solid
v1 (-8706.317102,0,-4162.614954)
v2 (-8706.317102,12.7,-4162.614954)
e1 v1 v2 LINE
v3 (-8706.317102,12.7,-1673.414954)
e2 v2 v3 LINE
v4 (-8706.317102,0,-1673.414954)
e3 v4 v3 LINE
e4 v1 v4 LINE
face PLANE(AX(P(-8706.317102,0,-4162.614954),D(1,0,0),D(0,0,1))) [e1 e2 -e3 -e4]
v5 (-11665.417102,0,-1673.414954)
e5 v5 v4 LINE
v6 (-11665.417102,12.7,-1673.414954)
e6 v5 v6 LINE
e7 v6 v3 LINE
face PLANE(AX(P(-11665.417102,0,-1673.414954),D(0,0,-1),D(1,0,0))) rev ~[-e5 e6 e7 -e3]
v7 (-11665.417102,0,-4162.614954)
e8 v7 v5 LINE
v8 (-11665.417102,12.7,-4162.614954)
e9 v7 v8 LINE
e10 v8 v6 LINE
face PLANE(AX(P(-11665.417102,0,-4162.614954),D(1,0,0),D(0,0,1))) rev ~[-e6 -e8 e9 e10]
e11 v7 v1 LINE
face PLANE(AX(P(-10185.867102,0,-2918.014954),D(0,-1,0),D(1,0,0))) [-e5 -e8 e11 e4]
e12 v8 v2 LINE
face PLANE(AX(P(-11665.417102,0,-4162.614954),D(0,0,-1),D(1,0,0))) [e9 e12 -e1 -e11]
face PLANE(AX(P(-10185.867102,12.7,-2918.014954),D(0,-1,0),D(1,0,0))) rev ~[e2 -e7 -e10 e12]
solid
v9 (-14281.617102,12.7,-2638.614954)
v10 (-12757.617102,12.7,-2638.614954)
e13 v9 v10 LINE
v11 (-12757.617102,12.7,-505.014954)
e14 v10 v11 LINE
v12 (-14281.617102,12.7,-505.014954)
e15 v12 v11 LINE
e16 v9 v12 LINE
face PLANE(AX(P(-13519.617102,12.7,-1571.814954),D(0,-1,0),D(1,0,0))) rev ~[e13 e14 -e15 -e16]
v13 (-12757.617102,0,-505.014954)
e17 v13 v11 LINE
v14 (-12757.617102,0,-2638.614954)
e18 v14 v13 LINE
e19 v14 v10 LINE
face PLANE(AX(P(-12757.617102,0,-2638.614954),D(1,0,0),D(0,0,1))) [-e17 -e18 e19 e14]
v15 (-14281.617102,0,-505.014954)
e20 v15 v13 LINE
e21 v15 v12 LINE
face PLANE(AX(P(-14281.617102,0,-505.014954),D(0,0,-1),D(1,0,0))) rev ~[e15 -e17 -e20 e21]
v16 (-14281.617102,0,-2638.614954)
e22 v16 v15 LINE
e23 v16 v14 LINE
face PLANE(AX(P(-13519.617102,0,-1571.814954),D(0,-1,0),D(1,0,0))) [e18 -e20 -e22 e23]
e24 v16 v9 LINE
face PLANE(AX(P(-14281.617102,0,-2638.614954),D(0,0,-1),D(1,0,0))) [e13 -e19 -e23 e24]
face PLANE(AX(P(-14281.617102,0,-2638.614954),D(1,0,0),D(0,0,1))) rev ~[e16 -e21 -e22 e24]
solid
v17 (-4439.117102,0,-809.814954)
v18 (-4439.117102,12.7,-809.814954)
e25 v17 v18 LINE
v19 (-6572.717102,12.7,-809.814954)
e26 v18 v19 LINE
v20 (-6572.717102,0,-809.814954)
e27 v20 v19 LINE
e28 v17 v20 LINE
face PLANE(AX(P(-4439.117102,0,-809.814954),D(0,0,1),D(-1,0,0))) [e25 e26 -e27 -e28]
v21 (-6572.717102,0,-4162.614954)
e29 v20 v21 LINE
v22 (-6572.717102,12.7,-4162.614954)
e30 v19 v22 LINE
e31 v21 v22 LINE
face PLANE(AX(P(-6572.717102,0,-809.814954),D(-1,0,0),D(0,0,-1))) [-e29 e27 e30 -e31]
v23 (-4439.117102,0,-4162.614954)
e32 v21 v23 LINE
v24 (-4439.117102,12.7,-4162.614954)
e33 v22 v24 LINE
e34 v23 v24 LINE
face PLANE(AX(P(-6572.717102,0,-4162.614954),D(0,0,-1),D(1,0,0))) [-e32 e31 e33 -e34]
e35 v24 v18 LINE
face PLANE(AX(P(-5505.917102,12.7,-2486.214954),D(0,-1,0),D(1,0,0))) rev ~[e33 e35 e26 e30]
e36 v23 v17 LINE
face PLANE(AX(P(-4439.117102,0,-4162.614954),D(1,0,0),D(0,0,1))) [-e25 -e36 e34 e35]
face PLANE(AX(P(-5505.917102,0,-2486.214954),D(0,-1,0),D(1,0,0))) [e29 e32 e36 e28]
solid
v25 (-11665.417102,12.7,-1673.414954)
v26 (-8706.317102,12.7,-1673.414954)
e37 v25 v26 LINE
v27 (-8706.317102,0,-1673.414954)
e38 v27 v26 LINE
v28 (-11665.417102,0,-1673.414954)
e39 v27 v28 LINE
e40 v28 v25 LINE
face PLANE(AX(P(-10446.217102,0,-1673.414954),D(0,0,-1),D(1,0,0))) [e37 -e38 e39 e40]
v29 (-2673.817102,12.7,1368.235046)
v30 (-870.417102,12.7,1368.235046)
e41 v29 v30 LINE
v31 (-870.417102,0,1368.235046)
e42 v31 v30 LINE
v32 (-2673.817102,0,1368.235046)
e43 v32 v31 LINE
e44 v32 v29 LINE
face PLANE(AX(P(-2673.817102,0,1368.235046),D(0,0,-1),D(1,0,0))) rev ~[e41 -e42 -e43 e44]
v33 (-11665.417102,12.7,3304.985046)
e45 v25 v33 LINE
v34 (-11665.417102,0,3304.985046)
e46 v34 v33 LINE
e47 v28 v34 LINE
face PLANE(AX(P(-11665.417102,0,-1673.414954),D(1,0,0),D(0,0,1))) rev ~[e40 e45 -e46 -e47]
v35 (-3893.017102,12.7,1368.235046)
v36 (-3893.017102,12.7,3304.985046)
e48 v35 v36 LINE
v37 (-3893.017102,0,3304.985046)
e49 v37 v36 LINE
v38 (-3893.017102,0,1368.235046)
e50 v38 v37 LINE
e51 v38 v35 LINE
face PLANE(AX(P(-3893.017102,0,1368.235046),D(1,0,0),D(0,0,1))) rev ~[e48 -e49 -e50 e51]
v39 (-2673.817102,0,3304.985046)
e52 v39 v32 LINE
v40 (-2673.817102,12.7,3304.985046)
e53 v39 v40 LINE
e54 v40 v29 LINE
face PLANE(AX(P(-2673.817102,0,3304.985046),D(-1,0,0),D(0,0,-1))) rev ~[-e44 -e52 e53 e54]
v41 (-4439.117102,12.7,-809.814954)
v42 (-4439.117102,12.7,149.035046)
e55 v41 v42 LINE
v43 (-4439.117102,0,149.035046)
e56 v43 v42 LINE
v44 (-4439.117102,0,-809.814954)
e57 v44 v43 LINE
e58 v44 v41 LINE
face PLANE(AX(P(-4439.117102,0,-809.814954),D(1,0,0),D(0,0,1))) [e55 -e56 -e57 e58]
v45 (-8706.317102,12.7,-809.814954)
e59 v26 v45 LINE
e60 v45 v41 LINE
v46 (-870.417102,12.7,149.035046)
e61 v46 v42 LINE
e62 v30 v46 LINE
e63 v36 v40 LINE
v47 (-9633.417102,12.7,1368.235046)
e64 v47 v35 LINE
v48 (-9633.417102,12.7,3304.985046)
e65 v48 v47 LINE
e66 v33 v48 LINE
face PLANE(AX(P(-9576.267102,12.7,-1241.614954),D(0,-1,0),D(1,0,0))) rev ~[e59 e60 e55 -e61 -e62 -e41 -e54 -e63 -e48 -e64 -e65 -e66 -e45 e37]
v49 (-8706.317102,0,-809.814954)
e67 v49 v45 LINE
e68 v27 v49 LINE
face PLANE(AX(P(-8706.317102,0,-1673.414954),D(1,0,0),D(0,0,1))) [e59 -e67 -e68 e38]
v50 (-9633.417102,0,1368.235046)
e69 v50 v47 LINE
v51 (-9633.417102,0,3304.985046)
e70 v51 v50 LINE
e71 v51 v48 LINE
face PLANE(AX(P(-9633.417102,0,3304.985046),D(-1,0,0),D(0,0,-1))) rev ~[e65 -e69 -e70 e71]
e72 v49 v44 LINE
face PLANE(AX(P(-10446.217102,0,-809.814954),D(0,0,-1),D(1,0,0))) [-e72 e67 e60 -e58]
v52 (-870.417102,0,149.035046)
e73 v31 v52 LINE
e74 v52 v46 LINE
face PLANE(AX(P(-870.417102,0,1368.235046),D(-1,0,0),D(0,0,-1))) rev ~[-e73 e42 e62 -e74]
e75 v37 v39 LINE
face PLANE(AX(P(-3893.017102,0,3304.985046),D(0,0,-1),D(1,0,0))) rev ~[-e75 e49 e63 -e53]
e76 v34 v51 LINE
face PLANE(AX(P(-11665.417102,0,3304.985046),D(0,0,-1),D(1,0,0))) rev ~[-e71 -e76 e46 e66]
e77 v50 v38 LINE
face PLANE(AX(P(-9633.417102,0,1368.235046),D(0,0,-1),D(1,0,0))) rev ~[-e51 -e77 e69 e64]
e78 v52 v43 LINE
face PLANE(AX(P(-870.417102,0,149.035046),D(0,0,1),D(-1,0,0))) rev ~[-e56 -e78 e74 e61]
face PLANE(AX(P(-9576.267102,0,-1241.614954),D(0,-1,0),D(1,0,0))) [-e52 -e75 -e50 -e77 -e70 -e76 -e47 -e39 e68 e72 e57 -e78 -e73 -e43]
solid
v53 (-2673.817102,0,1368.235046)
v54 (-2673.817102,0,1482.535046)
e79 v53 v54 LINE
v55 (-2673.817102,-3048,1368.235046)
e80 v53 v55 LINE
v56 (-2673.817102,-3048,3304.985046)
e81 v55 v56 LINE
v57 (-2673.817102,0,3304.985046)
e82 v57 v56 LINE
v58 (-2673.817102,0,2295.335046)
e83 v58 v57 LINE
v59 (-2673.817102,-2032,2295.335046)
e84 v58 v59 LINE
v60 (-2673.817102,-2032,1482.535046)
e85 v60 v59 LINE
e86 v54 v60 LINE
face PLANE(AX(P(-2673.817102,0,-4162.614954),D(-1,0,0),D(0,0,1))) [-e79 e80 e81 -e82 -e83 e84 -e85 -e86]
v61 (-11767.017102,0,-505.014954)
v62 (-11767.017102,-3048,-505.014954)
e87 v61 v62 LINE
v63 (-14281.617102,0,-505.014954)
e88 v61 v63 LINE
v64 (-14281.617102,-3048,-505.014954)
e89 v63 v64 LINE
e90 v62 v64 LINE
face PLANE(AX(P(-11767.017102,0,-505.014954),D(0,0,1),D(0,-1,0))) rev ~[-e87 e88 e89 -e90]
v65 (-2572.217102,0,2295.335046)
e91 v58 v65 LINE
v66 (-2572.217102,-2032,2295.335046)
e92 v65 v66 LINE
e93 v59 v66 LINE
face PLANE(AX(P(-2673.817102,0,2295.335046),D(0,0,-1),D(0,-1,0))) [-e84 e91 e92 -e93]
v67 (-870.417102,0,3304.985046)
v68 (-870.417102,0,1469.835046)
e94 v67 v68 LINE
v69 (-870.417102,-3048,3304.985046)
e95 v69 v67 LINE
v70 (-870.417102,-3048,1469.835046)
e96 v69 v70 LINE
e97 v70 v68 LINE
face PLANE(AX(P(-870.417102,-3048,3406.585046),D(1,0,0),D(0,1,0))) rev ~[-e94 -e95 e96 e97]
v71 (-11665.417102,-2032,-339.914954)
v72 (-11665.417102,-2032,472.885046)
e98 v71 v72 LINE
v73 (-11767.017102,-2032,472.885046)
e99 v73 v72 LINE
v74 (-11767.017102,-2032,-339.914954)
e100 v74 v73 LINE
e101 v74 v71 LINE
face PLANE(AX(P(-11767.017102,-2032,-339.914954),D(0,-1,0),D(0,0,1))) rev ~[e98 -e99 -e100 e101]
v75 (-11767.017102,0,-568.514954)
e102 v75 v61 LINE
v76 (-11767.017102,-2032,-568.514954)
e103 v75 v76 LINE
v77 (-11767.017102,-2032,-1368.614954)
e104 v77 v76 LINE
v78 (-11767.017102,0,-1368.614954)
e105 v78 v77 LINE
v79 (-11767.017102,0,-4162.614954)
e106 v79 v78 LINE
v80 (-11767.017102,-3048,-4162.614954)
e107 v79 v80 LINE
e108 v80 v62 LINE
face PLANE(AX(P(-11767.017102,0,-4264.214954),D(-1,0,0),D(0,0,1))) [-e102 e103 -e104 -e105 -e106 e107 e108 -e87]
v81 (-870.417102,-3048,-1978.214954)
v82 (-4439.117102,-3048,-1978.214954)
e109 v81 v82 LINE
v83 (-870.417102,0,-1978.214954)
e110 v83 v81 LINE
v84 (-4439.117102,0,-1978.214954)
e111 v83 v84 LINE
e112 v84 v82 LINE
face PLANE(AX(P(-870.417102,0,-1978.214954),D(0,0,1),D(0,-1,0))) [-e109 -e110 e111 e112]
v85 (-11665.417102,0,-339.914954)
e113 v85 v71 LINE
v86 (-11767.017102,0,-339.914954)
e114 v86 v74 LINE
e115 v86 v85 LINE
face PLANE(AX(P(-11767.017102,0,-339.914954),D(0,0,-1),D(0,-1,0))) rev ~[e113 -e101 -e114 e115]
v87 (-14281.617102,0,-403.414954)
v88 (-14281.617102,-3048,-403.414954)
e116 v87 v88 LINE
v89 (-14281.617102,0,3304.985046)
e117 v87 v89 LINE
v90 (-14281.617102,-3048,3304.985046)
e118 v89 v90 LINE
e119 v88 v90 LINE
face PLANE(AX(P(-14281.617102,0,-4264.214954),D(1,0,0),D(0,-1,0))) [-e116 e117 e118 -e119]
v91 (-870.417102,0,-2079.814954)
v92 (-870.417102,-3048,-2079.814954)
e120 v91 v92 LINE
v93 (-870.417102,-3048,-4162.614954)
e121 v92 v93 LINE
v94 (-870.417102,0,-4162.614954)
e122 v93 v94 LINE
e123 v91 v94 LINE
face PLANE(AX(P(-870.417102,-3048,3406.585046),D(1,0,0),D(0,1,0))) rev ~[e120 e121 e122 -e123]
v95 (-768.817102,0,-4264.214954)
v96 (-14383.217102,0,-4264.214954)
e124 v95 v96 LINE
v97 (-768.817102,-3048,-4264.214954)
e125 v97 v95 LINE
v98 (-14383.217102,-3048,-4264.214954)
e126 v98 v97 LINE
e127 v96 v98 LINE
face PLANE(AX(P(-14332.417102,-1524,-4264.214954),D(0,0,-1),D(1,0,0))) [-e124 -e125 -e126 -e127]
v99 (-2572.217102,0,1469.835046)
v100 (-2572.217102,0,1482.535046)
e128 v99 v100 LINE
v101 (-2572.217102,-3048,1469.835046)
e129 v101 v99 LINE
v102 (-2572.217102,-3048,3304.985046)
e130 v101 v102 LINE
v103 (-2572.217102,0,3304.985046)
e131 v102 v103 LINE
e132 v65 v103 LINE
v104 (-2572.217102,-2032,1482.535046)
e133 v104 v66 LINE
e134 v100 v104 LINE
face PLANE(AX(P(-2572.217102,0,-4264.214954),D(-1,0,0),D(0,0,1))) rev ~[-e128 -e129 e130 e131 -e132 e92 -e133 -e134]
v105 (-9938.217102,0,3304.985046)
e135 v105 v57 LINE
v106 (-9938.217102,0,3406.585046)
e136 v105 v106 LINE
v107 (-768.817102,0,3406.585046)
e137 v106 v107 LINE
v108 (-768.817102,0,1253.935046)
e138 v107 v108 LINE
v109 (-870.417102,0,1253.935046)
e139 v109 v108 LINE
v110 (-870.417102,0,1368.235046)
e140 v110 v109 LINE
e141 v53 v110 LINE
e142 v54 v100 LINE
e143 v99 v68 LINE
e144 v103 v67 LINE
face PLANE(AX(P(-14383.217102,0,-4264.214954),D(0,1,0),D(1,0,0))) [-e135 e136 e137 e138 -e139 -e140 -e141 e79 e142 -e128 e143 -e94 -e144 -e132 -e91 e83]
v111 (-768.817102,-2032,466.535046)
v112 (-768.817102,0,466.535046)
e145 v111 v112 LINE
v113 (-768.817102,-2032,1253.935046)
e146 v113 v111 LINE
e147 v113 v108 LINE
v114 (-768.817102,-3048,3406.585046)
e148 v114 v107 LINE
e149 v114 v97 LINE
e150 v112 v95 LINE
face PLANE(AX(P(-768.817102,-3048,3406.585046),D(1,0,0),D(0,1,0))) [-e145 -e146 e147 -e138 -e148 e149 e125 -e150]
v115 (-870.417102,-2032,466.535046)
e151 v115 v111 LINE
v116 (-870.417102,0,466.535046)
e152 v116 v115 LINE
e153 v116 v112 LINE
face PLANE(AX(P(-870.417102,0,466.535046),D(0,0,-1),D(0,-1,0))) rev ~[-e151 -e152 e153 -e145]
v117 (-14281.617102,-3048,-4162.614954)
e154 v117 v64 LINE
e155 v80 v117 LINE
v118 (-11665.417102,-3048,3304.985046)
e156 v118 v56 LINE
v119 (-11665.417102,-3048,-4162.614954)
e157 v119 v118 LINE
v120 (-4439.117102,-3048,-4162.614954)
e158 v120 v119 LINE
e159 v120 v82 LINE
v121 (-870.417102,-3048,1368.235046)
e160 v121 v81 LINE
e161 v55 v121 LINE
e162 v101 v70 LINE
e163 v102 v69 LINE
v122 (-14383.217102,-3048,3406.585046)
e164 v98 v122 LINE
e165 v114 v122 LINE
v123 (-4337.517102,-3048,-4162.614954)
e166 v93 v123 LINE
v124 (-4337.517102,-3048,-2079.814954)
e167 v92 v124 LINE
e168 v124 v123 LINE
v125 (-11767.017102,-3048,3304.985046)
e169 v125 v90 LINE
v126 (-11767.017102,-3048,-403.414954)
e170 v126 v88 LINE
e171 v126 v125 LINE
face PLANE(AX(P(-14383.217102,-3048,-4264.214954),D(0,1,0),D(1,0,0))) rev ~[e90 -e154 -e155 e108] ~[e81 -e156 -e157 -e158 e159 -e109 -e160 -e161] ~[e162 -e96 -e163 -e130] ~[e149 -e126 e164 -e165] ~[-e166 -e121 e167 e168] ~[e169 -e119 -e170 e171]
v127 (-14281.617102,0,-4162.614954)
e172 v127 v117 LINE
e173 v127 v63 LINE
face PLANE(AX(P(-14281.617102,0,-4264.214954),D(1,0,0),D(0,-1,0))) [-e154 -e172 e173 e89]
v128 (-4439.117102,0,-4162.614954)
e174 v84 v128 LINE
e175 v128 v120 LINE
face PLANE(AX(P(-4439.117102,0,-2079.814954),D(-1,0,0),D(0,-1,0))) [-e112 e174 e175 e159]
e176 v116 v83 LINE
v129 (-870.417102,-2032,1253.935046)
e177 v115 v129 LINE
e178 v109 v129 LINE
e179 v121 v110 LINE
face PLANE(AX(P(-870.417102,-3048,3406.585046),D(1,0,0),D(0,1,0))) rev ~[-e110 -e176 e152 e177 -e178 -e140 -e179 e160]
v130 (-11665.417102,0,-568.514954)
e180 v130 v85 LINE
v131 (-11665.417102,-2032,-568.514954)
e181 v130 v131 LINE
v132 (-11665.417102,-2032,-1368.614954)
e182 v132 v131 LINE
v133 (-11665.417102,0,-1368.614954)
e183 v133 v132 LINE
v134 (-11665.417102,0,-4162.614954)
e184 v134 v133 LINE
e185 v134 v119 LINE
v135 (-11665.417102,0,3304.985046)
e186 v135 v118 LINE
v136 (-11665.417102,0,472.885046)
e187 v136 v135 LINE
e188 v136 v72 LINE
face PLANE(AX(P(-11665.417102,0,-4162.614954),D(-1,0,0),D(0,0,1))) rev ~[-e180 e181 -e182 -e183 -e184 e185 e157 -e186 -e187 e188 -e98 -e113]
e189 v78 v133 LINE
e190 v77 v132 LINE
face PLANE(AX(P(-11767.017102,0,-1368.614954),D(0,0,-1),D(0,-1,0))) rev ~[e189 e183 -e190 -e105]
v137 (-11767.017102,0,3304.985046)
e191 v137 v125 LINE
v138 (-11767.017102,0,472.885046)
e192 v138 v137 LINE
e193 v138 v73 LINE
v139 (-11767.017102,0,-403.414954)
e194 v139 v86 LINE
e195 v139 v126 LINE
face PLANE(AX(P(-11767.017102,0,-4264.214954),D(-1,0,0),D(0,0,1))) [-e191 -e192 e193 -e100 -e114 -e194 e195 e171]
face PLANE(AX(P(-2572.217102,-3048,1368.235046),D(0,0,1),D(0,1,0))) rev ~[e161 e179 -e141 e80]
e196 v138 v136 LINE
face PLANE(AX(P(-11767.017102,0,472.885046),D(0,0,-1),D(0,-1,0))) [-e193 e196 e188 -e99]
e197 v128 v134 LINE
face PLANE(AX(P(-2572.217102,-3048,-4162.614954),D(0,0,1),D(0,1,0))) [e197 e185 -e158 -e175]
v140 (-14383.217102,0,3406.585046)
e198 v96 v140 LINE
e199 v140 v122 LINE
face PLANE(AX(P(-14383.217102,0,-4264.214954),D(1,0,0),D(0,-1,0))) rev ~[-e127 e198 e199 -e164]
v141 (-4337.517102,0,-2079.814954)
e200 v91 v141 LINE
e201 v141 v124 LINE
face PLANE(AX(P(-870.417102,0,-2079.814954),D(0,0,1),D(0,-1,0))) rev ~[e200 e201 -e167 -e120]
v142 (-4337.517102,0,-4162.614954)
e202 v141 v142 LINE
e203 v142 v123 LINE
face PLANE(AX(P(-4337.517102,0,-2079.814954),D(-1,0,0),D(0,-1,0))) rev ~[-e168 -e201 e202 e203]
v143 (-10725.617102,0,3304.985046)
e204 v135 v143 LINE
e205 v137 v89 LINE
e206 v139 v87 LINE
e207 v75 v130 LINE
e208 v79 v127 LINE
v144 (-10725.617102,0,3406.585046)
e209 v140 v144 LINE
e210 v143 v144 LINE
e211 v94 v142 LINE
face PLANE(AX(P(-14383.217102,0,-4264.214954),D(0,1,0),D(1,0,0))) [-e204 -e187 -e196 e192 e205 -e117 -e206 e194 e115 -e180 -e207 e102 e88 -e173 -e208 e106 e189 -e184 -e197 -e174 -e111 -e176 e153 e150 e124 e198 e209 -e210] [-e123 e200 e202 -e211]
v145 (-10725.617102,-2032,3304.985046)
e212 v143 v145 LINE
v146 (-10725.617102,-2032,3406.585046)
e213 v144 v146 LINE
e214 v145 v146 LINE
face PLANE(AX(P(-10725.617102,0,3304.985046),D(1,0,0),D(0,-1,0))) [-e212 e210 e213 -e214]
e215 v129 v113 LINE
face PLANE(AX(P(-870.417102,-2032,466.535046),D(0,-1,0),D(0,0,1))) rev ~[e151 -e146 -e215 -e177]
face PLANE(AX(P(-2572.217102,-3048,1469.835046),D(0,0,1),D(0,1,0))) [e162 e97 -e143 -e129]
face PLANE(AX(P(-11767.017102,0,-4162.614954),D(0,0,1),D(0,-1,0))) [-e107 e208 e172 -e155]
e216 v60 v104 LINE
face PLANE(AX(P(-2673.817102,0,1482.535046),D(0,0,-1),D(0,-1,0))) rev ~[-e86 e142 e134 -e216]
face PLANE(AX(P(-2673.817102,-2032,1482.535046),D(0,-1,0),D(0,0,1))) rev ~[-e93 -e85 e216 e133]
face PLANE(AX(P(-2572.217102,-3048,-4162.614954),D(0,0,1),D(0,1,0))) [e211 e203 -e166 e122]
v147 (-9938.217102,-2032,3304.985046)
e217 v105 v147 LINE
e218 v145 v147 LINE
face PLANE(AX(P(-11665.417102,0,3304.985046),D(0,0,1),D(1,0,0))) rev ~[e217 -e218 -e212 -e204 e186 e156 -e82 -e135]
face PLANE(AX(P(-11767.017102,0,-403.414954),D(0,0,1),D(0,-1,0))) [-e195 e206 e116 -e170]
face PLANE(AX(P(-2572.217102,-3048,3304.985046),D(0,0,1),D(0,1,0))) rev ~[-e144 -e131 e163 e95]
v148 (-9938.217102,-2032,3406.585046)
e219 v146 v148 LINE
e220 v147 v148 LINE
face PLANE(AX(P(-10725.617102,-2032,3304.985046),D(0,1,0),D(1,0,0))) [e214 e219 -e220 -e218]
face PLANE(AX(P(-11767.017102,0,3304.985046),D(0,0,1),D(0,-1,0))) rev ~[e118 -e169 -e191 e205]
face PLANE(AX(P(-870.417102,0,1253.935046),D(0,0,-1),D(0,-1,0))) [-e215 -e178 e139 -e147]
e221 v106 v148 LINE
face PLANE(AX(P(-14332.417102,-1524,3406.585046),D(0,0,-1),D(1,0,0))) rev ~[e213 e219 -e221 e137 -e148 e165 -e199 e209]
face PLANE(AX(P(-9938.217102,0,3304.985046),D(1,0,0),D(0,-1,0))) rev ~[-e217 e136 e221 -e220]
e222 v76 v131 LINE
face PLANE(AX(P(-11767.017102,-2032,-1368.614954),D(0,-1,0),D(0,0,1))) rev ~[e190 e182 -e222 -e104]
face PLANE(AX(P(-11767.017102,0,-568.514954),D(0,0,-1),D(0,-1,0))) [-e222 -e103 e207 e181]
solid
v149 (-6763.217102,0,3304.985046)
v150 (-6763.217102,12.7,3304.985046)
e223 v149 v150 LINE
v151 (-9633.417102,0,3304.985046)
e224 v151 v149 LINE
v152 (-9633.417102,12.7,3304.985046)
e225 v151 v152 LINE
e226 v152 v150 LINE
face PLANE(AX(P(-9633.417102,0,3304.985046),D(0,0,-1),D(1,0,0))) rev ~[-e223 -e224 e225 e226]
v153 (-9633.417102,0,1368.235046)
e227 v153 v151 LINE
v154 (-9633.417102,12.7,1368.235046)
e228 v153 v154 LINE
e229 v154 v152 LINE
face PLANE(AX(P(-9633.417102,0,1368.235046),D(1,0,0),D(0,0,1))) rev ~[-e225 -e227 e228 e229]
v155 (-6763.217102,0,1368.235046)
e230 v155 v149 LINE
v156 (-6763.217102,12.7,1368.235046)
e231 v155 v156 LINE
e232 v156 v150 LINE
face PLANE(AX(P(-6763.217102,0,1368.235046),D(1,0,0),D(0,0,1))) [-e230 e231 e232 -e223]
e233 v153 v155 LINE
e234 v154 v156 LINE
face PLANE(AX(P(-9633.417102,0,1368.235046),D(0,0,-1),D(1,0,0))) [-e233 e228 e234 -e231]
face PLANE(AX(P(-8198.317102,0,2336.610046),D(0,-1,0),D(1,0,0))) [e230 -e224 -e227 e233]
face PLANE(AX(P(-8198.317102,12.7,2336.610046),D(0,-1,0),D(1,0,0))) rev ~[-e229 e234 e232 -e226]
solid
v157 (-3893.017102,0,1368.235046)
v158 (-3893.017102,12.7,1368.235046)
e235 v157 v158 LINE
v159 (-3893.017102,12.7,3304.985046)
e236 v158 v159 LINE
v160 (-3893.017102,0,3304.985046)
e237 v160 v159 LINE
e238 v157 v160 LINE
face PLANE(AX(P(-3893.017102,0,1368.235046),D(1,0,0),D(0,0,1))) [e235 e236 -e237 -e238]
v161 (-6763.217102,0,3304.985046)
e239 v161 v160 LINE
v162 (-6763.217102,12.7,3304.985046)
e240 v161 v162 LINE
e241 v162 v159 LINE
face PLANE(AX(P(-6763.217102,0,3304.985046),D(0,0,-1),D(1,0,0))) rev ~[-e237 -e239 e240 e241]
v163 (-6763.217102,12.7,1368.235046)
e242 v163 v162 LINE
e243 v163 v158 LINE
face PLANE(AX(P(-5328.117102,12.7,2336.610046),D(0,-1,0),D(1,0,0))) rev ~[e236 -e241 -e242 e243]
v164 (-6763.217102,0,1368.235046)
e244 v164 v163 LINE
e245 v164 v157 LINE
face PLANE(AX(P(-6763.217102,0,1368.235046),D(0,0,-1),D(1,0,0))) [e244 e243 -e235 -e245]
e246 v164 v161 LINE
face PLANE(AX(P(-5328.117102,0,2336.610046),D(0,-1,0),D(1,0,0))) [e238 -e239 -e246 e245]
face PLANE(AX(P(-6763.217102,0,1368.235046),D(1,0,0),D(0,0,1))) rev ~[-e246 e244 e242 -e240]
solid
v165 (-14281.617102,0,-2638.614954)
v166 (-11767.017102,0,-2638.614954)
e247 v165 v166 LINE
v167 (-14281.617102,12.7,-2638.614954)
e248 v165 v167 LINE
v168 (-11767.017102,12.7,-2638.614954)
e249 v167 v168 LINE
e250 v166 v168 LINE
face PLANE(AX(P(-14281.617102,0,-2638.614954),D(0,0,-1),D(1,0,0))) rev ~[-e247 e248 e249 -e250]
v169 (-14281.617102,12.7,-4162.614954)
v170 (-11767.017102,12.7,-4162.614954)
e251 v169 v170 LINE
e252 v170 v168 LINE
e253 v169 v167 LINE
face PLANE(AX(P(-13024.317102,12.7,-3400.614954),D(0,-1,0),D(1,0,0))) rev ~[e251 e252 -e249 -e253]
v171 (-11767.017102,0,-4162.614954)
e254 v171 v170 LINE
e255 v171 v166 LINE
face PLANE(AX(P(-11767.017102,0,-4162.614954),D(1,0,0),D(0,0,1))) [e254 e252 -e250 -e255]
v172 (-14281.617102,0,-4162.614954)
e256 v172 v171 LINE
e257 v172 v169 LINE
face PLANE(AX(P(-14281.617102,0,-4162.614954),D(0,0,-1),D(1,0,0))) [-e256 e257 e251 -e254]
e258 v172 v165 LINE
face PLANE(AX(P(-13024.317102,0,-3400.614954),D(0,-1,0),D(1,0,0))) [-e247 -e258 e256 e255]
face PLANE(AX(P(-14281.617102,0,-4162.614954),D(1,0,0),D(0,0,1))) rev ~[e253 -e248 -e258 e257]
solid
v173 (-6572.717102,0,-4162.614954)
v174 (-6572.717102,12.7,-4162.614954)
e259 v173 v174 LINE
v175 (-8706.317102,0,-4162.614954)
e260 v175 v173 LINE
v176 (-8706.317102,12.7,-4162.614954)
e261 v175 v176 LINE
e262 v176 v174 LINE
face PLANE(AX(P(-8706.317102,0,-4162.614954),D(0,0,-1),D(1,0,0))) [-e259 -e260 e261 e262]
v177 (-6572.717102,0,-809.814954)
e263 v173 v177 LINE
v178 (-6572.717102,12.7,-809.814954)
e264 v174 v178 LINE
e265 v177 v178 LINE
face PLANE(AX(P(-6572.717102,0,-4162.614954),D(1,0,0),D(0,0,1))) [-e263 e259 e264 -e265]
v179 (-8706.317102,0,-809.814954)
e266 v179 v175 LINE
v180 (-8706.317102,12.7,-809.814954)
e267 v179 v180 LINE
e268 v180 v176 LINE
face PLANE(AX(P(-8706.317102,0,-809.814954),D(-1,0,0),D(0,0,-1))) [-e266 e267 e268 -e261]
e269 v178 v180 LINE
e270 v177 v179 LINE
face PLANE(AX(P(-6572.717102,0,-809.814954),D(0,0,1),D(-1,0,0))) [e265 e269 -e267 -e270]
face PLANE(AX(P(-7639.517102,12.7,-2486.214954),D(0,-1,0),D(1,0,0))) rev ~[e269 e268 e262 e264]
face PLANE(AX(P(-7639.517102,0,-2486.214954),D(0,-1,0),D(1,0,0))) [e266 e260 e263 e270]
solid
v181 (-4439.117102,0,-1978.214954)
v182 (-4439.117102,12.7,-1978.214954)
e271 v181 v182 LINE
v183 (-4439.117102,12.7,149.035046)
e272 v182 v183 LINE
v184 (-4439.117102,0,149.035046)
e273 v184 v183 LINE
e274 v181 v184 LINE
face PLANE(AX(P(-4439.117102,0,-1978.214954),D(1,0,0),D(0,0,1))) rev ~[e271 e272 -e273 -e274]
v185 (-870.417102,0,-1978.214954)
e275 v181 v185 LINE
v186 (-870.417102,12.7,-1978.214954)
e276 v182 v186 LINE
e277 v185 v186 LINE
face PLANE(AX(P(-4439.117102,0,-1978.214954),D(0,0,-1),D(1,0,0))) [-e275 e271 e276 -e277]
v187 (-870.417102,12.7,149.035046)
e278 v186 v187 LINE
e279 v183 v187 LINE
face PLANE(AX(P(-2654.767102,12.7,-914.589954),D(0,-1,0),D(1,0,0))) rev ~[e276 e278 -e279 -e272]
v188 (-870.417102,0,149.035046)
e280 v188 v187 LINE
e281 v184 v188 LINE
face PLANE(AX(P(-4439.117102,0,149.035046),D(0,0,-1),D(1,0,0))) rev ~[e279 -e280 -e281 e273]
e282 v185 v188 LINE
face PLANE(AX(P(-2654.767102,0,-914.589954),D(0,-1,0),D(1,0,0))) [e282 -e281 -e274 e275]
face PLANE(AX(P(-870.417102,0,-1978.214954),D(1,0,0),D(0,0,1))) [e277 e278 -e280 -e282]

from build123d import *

# Parameters (mm, degrees)
F0_W      = 9194.8
F0_H      = 7670.8
F0_W_2    = 8991.6
F0_H_2    = 7467.6
F1_DEPTH  = 3048
F2_W      = 3048
F2_H      = 101.6
F3_DEPTH  = 1701.8
F4_W      = 3048
F4_H      = 5530.85
F5_DEPTH  = 2336.8
F6_W      = 101.6
F6_H      = 3048
F7_DEPTH  = 7670.8
F8_W      = 3048
F8_H      = 101.6
F9_DEPTH  = 1701.8
F10_W     = 3048
F10_H     = 101.6
F11_DEPTH = 3568.7
F12_W     = 101.6
F12_H     = 3048
F13_DEPTH = 2082.8
F14_W     = 3048
F14_H     = 101.6
F15_DEPTH = 2514.6
F16_W     = 101.6
F16_H     = 3048
F17_DEPTH = 7670.8
F18_W     = 787.4
F18_H     = 2032
F19_DEPTH = 5664.2
F20_W     = 2032
F20_H     = 812.8
F20_H_2   = 800.1
F21_DEPTH = 2133.6
F22_W     = 2032
F22_H     = 812.8
F23_DEPTH = 355.6
F24_W     = 2032
F24_H     = 787.4
F25_DEPTH = 2870.2
F27_DEPTH = 12.7
F28_W     = 2870.2
F28_H     = 1936.75
F29_DEPTH = 12.7
F30_W     = 2870.2
F30_H     = 1936.75
F31_DEPTH = 12.7
F32_W     = 3568.7
F32_H     = 2127.2500000001
F33_DEPTH = 12.7
F34_W     = 1524
F34_H     = 2133.6
F35_DEPTH = 12.7
F36_W     = 2514.6
F36_H     = 1524
F37_DEPTH = 12.7
F38_W     = 2959.1
F38_H     = 2489.2
F39_DEPTH = 12.7
F40_DEPTH = 12.7
F41_DEPTH = 12.7
F42_W     = 6007.1
F42_H     = 958.85
F43_DEPTH = 12.7
F44_W     = 1739.9
F44_H     = 863.6
F45_DEPTH = 12.7


with BuildPart() as f1:
    # F0 (on Front) → F1 (new body)
    with BuildSketch(Plane.XZ):
        with Locations((-7169.6171020508, -428.8149536133)):
            Rectangle(F0_W, F0_H)
        with Locations((-7169.6171020508, -428.8149536133)):
            Rectangle(F0_W_2, F0_H_2, mode=Mode.SUBTRACT)
    extrude(amount=F1_DEPTH)

    # F2 (on face) → F3 (join)
    with BuildSketch(Plane.YZ.offset(-2572.2171020508)):
        with Locations((-1524, 3355.7850463867)):
            Rectangle(F2_W, F2_H)
        with Locations((-1524, 1419.0350463867)):
            Rectangle(F2_W, F2_H)
    extrude(amount=F3_DEPTH)

    # F4 (on face) → F5 (cut)
    with BuildSketch(Plane.YZ.offset(-2572.2171020508)):
        with Locations((-1524, -1397.1899536133)):
            Rectangle(F4_W, F4_H)
    extrude(amount=-F5_DEPTH, mode=Mode.SUBTRACT)

    # F6 (on face) → F7 (join, through all)
    with BuildSketch(Plane.XY.offset(3406.5850463867)):
        with Locations((-819.6171020508, -1524)):
            Rectangle(F6_W, F6_H)
    extrude(amount=-F7_DEPTH)

    # F8 (on face) → F9 (join, through all)
    with BuildSketch(Plane.YZ.offset(-2572.2171020508)):
        with Locations((-1524, -4213.4149536133)):
            Rectangle(F8_W, F8_H)
    extrude(amount=F9_DEPTH)

    # F10 (on face) → F11 (join)
    with BuildSketch(Plane(origin=(-870.4171020508, 0, 0), x_dir=(0, -1, 0), z_dir=(-1, 0, 0))):
        with Locations((1524, -2029.0149536133)):
            Rectangle(F10_W, F10_H)
    extrude(amount=F11_DEPTH)

    # F12 (on face) → F13 (join, through all)
    with BuildSketch(Plane(origin=(0, 0, -2079.8149536133), x_dir=(1, 0, 0), z_dir=(0, 0, -1))):
        with Locations((-4388.3171020508, 1524)):
            Rectangle(F12_W, F12_H)
    extrude(amount=F13_DEPTH)

    # F14 (on face) → F15 (join)
    with BuildSketch(Plane(origin=(-11767.0171020508, 0, 0), x_dir=(0, -1, 0), z_dir=(-1, 0, 0))):
        with Locations((1524, 3355.7850463867)):
            Rectangle(F14_W, F14_H)
        with Locations((1524, -4213.4149536133)):
            Rectangle(F14_W, F14_H)
        with Locations((1524, -454.2149536133)):
            Rectangle(F14_W, F14_H)
    extrude(amount=F15_DEPTH)

    # F16 (on face) → F17 (join, through all)
    with BuildSketch(Plane(origin=(0, 0, -4264.2149536133), x_dir=(1, 0, 0), z_dir=(0, 0, -1))):
        with Locations((-14332.4171020508, 1524)):
            Rectangle(F16_W, F16_H)
    extrude(amount=-F17_DEPTH)

    # F18 (on face) → F19 (cut)
    with BuildSketch(Plane(origin=(0, 0, 3304.9850463867), x_dir=(1, 0, 0), z_dir=(0, 0, -1))):
        with Locations((-10331.9171020508, 1016)):
            Rectangle(F18_W, F18_H)
    extrude(amount=-F19_DEPTH, mode=Mode.SUBTRACT)

    # F20 (on face) → F21 (cut)
    with BuildSketch(Plane(origin=(-11767.0171020508, 0, 0), x_dir=(0, -1, 0), z_dir=(-1, 0, 0))):
        with Locations((1016, 66.4850463867)):
            Rectangle(F20_W, F20_H)
        with Locations((1016, -968.5649536133)):
            Rectangle(F20_W, F20_H_2)
    extrude(amount=-F21_DEPTH, mode=Mode.SUBTRACT)

    # F22 (on face) → F23 (cut)
    with BuildSketch(Plane(origin=(-2673.8171020508, 0, 0), x_dir=(0, -1, 0), z_dir=(-1, 0, 0))):
        with Locations((1016, 1888.9350463867)):
            Rectangle(F22_W, F22_H)
    extrude(amount=-F23_DEPTH, mode=Mode.SUBTRACT)

    # F24 (on face) → F25 (cut)
    with BuildSketch(Plane(origin=(-870.4171020508, 0, 0), x_dir=(0, -1, 0), z_dir=(-1, 0, 0))):
        with Locations((1016, 860.2350463867)):
            Rectangle(F24_W, F24_H)
    extrude(amount=-F25_DEPTH, mode=Mode.SUBTRACT)


with BuildPart() as f27:
    # F26 (on face) → F27 (new body)
    with BuildSketch(Plane(origin=(0, 0, 0), x_dir=(-1, 0, 0), z_dir=(0, 1, 0))):
        Polygon((3893.0171020508, 1368.2350463867), (3893.0171020508, 3304.9850463867), (2673.8171020508, 3304.9850463867), (2673.8171020508, 1368.2350463867), (870.4171020508, 1368.2350463867), (870.4171020508, 149.0350463867), (10446.2171020508, 149.0350463867), (10446.2171020508, -1673.4149536133), (11665.4171020508, -1673.4149536133), (11665.4171020508, 3304.9850463867), (9633.4171020508, 3304.9850463867), (9633.4171020508, 1368.2350463867), align=None)
    extrude(amount=F27_DEPTH)

    # F42 (on face) + F27_face (on face) → F43 (join, through all)
    with BuildSketch(Plane.XZ):
        with Locations((-7442.6671020508, -330.3899536133)):
            Rectangle(F42_W, F42_H)
    with BuildSketch(Plane(origin=(-7228.9160188464, 0, 1061.078645363), x_dir=(-1, 0, 0), z_dir=(0, -1, 0))):
        Polygon((-3335.8989167956, -307.1564010237), (2404.5010832044, -307.1564010237), (2404.5010832044, -2243.9064010237), (4436.5010832044, -2243.9064010237), (4436.5010832044, 2734.4935989763), (3217.3010832044, 2734.4935989763), (3217.3010832044, 912.0435989763), (-6358.4989167956, 912.0435989763), (-6358.4989167956, -307.1564010234), (-4555.0989167956, -307.1564010237), (-4555.0989167956, -2243.9064010237), (-3335.8989167956, -2243.9064010237), align=None)
    extrude(amount=-F43_DEPTH)

    # F44 (on face) → F45 (join, through all)
    with BuildSketch(Plane.XZ):
        with Locations((-9576.2671020508, -1241.6149536133)):
            Rectangle(F44_W, F44_H)
    extrude(amount=-F45_DEPTH)


with BuildPart() as f29:
    # F28 (on face) → F29 (new body, through all)
    with BuildSketch(Plane.XZ):
        with Locations((-8198.3171020508, 2336.6100463867)):
            Rectangle(F28_W, F28_H)
    extrude(amount=-F29_DEPTH)


with BuildPart() as f31:
    # F30 (on face) → F31 (new body)
    with BuildSketch(Plane.XZ):
        with Locations((-5328.1171020508, 2336.6100463867)):
            Rectangle(F30_W, F30_H)
    extrude(amount=-F31_DEPTH)


with BuildPart() as f33:
    # F32 (on face) → F33 (new body)
    with BuildSketch(Plane.XZ):
        with Locations((-2654.7671020508, -914.5899536133)):
            Rectangle(F32_W, F32_H)
    extrude(amount=-F33_DEPTH)


with BuildPart() as f35:
    # F34 (on face) → F35 (new body)
    with BuildSketch(Plane.XZ):
        with Locations((-13519.6171020508, -1571.8149536133)):
            Rectangle(F34_W, F34_H)
    extrude(amount=-F35_DEPTH)


with BuildPart() as f37:
    # F36 (on face) → F37 (new body)
    with BuildSketch(Plane.XZ):
        with Locations((-13024.3171020508, -3400.6149536133)):
            Rectangle(F36_W, F36_H)
    extrude(amount=-F37_DEPTH)


with BuildPart() as f39:
    # F38 (on face) → F39 (new body)
    with BuildSketch(Plane.XZ):
        with Locations((-10185.8671020508, -2918.0149536133)):
            Rectangle(F38_W, F38_H)
    extrude(amount=-F39_DEPTH)


with BuildPart() as f40:
    # F38 (on face) → F40 (new body)
    with BuildSketch(Plane.XZ):
        Polygon((-6572.7171020508, -4162.6149536133), (-6572.7171020508, -809.8149536133), (-8706.3171020508, -809.8149536133), (-8706.3171020508, -1673.4149536133), (-8706.3171020508, -4162.6149536133), align=None)
    extrude(amount=-F40_DEPTH)


with BuildPart() as f41:
    # F38 (on face) → F41 (new body)
    with BuildSketch(Plane.XZ):
        Polygon((-4439.1171020508, -809.8149536133), (-6572.7171020508, -809.8149536133), (-6572.7171020508, -4162.6149536133), (-4439.1171020508, -4162.6149536133), (-4439.1171020508, -1978.2149536134), align=None)
    extrude(amount=-F41_DEPTH)


solid = Compound([f1.part, f27.part, f29.part, f31.part, f33.part, f35.part, f37.part, f39.part, f40.part, f41.part])
